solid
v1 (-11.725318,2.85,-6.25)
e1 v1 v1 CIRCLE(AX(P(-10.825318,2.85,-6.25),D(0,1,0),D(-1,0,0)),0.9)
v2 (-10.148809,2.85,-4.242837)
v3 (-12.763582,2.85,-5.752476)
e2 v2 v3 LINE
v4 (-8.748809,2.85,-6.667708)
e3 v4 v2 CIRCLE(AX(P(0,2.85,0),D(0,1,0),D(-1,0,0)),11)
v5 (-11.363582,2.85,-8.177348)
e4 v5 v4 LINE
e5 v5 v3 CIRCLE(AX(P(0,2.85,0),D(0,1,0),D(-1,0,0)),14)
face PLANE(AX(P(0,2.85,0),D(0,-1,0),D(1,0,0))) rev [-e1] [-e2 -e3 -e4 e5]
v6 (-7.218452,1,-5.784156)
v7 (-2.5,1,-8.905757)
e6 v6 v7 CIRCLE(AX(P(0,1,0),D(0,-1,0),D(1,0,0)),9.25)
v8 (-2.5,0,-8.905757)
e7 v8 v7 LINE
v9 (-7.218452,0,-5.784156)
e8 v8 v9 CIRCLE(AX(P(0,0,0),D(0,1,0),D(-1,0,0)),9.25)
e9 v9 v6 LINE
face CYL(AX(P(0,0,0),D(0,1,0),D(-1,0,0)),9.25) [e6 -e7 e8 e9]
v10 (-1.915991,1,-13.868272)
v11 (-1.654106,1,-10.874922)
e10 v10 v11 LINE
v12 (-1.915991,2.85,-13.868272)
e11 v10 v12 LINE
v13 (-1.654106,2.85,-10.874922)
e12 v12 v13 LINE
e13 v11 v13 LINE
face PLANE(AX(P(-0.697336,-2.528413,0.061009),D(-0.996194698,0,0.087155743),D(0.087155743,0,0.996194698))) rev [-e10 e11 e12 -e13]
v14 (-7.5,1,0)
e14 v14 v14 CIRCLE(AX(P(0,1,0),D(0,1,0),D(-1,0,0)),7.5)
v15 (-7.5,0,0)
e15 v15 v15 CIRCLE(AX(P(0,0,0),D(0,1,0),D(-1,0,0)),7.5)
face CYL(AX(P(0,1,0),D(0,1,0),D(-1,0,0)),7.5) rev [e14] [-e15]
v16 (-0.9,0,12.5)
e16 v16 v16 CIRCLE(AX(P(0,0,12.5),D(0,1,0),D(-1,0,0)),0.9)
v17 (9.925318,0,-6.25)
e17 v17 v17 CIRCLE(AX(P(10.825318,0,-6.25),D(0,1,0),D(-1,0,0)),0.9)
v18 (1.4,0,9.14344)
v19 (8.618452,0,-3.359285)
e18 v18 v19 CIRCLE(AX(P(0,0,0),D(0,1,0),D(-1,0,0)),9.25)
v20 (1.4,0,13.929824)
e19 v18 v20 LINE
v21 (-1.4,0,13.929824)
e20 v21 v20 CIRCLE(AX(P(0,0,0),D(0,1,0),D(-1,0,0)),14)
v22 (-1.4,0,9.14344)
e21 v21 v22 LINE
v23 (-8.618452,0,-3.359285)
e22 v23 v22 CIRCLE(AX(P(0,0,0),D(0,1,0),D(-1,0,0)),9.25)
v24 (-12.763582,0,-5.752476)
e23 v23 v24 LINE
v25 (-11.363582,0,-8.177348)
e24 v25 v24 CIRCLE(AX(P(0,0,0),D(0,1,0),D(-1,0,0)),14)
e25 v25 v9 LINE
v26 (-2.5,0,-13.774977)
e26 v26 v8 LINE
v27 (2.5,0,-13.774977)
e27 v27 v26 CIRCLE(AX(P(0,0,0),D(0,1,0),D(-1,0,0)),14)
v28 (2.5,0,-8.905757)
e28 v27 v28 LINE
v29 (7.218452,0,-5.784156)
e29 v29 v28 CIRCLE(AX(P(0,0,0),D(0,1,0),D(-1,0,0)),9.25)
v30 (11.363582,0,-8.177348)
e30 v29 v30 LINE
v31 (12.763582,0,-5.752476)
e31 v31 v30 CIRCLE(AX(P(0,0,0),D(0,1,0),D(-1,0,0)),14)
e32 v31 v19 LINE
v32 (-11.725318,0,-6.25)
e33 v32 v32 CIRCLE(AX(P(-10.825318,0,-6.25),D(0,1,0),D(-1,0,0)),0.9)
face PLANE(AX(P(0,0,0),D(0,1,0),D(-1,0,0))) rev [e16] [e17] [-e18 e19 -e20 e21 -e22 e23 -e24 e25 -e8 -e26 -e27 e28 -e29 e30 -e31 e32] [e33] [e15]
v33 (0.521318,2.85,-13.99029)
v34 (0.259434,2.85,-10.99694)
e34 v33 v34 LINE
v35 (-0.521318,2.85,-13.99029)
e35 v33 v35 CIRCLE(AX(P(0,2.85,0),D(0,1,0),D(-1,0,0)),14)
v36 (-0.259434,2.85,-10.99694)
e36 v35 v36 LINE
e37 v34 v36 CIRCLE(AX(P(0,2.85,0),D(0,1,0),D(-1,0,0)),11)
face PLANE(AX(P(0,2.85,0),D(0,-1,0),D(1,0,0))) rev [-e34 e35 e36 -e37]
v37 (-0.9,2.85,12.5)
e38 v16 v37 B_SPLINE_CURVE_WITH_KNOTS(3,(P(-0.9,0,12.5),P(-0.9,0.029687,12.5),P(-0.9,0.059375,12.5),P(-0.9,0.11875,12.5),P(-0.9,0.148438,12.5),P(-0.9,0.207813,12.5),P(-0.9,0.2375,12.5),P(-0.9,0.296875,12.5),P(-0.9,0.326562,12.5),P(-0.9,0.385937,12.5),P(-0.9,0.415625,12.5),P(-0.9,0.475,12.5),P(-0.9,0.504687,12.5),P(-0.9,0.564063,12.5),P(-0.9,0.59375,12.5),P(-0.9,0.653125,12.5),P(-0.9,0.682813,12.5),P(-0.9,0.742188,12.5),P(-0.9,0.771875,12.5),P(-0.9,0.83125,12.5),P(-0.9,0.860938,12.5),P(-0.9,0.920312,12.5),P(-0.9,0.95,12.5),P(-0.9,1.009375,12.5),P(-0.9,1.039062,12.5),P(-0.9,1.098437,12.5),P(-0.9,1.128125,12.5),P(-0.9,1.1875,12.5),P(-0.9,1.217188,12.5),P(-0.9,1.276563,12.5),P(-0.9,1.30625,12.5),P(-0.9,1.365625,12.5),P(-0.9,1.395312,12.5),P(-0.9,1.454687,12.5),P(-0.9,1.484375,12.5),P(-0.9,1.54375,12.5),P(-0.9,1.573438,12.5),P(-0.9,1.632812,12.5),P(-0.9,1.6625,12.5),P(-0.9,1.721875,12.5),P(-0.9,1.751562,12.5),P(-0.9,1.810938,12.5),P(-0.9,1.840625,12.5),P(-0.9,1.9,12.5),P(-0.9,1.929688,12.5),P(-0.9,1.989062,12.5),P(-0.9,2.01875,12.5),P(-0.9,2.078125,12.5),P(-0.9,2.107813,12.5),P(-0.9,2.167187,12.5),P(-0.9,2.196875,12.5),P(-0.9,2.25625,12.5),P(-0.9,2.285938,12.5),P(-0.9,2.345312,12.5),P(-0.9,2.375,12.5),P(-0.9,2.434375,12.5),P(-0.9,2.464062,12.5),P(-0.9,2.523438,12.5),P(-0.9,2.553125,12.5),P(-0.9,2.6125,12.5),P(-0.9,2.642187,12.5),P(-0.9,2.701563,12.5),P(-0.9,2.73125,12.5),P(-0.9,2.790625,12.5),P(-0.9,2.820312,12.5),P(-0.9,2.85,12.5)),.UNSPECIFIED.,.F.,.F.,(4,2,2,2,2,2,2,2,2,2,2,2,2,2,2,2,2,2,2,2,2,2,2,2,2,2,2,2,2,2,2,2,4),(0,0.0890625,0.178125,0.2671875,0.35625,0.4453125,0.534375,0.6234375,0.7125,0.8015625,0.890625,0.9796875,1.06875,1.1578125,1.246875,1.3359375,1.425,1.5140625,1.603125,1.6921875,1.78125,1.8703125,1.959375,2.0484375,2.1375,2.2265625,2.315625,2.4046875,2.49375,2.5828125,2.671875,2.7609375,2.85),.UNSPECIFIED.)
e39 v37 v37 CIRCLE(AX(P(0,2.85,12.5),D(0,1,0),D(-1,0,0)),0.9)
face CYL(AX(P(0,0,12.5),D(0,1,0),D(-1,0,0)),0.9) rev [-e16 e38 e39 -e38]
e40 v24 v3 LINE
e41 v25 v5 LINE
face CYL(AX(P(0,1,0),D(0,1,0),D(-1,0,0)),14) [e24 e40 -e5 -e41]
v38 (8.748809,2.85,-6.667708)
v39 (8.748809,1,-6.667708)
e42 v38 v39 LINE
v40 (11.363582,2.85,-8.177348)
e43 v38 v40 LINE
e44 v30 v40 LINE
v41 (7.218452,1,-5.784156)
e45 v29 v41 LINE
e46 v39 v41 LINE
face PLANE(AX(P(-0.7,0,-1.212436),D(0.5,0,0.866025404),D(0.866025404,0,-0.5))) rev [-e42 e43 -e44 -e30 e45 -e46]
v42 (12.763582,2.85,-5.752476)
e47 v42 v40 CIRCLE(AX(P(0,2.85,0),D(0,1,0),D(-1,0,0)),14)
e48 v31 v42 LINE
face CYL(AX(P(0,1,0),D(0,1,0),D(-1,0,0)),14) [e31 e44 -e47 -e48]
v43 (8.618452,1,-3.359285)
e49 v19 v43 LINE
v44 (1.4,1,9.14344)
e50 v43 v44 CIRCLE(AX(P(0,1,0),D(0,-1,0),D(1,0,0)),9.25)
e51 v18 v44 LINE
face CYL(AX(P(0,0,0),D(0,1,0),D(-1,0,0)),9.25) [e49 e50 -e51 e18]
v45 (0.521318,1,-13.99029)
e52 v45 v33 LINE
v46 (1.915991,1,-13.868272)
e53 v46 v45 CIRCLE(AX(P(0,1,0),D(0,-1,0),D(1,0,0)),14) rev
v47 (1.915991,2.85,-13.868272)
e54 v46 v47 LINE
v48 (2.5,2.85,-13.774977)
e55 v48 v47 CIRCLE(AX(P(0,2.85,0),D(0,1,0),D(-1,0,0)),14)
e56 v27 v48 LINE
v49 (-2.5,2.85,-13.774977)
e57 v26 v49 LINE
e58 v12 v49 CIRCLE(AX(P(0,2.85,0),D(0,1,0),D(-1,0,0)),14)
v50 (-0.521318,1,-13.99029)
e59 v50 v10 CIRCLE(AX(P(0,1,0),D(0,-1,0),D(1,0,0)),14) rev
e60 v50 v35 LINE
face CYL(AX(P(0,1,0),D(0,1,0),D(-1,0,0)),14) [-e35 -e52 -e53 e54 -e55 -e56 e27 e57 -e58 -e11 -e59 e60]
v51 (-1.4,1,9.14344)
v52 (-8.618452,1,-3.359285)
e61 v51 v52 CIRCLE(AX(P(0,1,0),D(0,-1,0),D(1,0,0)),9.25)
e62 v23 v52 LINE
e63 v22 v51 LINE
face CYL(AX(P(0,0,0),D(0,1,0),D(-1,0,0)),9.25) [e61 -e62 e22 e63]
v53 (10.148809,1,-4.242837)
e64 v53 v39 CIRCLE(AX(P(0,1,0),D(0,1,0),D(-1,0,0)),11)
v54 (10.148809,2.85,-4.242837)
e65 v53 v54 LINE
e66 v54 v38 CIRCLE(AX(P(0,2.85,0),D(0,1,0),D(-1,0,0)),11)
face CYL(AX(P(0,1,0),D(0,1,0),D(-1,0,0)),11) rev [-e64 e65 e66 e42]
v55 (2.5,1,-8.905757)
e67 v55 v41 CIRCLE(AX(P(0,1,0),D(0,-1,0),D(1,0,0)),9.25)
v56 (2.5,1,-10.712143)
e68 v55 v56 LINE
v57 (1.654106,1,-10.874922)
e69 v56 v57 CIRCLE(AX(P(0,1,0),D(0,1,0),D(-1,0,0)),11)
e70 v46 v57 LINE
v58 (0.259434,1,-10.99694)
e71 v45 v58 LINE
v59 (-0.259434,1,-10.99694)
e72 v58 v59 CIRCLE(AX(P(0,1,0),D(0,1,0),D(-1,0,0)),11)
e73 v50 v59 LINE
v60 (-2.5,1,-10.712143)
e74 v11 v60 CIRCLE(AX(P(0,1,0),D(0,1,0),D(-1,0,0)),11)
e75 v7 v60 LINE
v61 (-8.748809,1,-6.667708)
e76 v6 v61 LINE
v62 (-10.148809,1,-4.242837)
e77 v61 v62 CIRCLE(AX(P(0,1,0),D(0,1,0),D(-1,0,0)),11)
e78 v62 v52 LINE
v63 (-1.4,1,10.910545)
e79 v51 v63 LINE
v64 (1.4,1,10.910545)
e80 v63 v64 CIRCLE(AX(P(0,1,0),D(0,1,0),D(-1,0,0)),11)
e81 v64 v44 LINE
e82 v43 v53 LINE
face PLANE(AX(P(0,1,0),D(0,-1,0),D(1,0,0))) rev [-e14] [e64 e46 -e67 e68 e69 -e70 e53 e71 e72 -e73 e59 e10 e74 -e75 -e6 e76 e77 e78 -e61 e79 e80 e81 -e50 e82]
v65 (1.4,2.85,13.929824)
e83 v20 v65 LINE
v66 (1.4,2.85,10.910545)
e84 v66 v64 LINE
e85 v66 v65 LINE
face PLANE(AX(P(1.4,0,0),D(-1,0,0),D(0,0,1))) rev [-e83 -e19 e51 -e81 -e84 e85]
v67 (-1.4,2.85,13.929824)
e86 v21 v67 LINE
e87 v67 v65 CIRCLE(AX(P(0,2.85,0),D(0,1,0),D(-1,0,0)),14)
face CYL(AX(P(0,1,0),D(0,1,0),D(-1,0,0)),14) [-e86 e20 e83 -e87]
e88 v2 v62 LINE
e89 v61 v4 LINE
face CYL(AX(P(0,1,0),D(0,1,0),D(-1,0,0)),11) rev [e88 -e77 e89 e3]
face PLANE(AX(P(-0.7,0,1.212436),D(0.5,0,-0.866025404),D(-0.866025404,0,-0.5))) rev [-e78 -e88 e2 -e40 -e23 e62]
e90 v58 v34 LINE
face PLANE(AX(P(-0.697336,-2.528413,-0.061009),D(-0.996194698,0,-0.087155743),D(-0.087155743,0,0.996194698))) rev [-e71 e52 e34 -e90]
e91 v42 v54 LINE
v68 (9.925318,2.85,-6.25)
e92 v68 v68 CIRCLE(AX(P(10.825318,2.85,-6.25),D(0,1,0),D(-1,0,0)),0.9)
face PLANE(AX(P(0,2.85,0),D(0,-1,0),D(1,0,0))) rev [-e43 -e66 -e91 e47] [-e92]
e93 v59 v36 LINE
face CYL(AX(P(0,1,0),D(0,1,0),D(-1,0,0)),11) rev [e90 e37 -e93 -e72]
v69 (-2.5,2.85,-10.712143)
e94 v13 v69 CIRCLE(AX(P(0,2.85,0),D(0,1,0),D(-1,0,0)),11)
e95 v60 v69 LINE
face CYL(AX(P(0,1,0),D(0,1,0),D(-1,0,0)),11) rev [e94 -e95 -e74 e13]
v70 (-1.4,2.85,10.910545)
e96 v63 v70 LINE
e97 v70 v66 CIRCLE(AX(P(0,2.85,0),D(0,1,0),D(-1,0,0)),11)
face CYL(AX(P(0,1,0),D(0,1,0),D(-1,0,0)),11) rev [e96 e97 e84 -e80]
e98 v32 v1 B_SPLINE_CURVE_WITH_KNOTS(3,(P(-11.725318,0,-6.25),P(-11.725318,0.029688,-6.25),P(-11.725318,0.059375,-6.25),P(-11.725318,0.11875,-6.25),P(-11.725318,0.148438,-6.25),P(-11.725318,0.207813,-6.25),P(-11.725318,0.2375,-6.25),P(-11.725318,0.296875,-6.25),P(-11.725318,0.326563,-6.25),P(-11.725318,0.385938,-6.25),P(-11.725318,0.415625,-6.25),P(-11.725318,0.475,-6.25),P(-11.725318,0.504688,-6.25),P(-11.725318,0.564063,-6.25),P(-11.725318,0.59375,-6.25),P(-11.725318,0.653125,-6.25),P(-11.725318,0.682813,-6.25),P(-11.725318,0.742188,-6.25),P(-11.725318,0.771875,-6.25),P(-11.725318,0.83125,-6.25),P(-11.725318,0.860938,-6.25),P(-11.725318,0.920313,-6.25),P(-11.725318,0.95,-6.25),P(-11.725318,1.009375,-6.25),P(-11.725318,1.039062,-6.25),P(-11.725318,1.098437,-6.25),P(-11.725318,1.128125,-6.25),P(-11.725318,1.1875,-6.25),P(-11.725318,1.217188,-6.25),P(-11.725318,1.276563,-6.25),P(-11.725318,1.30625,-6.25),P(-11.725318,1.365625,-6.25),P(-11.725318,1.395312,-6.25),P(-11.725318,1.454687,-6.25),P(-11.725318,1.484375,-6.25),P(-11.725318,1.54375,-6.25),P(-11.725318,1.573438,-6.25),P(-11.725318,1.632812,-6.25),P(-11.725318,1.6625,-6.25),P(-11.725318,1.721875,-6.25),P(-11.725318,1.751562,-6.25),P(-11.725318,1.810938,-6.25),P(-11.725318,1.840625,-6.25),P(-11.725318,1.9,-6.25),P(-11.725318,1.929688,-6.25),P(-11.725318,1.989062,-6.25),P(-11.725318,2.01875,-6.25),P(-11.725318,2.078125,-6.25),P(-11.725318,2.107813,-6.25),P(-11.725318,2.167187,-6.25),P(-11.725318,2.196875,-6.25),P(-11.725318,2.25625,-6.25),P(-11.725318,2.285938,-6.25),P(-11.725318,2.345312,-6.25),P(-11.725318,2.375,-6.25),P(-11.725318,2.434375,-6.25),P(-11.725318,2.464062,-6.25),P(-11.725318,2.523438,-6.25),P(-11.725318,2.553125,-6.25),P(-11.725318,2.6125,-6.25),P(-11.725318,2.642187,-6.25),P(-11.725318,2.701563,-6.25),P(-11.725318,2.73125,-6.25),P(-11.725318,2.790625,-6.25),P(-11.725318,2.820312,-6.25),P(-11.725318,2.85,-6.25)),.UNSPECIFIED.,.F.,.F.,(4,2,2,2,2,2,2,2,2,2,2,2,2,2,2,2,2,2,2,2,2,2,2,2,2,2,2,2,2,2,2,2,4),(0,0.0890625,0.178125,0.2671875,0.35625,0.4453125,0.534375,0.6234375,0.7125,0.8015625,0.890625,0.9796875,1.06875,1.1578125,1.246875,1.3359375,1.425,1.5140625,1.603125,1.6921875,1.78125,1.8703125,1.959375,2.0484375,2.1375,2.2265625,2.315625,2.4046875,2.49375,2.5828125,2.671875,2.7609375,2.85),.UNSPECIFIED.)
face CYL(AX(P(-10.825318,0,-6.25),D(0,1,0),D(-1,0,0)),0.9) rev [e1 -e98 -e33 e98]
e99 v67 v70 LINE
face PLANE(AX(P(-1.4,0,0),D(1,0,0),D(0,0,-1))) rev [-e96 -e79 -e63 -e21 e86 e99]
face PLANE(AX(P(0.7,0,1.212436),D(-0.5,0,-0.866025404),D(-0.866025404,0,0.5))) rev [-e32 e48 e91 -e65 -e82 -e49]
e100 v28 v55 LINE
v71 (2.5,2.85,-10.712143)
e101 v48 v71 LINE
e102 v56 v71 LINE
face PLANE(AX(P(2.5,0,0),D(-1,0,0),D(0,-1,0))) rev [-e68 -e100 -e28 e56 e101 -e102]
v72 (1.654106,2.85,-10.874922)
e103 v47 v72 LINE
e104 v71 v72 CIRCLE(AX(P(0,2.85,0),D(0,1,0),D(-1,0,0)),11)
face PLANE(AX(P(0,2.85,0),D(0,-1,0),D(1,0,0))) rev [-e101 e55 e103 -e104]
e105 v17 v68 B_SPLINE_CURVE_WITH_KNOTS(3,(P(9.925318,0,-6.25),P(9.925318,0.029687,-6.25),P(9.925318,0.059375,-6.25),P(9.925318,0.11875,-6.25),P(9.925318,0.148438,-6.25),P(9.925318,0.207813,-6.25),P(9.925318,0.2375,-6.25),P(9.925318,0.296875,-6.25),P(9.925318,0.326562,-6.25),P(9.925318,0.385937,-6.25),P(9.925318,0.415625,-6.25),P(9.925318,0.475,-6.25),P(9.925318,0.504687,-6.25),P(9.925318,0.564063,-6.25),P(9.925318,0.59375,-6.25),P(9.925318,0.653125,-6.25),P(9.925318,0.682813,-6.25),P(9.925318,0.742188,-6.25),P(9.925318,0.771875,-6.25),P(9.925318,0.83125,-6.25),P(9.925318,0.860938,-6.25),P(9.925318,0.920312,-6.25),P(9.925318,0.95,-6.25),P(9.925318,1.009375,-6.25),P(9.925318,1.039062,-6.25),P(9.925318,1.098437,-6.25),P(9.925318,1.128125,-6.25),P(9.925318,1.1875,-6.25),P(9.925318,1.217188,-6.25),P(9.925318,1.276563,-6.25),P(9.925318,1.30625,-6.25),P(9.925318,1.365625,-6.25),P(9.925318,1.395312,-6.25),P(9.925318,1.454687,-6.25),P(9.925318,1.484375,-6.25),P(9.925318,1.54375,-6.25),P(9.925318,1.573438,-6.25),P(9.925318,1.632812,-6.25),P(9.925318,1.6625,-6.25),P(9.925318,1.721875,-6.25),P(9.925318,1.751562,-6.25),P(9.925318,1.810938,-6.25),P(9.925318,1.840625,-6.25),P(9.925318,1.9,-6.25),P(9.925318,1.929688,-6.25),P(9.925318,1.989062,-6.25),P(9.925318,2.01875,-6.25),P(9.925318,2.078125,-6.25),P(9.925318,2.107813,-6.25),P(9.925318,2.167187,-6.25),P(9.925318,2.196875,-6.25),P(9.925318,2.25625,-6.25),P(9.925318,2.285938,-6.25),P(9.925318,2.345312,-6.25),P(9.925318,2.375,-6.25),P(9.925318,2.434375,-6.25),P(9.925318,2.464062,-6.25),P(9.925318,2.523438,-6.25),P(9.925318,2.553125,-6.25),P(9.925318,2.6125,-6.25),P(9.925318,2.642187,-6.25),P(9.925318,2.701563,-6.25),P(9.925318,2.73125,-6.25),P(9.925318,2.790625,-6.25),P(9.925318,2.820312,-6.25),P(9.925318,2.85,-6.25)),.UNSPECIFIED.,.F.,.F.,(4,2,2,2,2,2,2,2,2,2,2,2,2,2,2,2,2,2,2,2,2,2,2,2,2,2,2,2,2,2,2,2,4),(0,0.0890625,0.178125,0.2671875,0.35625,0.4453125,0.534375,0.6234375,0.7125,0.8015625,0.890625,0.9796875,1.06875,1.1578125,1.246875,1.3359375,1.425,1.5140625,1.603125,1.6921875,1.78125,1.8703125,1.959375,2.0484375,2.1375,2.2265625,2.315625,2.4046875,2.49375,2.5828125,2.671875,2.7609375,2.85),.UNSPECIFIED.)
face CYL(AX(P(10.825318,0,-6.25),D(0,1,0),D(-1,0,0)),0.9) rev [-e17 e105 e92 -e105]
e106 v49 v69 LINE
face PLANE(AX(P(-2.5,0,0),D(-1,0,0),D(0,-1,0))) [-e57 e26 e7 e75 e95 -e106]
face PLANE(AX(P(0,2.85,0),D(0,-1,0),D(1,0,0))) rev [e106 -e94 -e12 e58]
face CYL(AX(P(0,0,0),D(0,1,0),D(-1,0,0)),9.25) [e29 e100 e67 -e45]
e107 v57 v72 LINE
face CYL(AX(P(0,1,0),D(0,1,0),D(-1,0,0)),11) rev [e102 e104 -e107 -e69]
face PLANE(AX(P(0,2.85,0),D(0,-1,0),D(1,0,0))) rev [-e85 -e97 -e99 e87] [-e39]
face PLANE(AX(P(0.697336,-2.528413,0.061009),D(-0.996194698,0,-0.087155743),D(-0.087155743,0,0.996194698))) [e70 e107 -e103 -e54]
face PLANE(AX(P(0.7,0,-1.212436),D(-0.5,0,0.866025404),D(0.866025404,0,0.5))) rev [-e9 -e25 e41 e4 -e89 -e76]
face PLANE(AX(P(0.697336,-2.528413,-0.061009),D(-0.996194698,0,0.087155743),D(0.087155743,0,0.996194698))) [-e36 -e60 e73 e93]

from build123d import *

# Parameters (mm, degrees)
CUT_EXTRUDE1_DEPTH     = 1.85
CUT_EXTRUDE2_START     = -2.85
CUT_EXTRUDE2_OUTLINE_R = 0.9
CUT_EXTRUDE2_DEPTH     = 2.85


# Read off the part's stored shape, not the designer's step: Cut-Extrude2
with BuildPart() as part:
    # Sketch1 → Revolve1 (revolve)
    with BuildSketch(Plane.XY, mode=Mode.PRIVATE) as revolve1_sk:
        Polygon((7.5, 0.9999999999999996), (7.5, 0), (14.000000000000002, 0), (14.000000000000002, 2.8500000000000005), (11.000000000000002, 2.85), (11.000000000000002, 1), align=None)
    revolve(revolve1_sk.sketch.rotate(Axis((3e-17, 0.9999999999999987, 0), (-3e-17, -1, 0)), 180), axis=Axis((3e-17, 0.9999999999999987, 0), (-3e-17, -1, 0)))

    # Sketch2 → Cut-Extrude1 (cut)
    with BuildSketch(Plane(origin=(9e-17, 2.8500000000000005, 0), x_dir=(1, -3e-17, 0), z_dir=(3e-17, 1, 0))):
        with BuildLine():
            ThreePointArc((0.259433716221758, 10.996940217482653), (0.6093823027349546, 10.983107629861117), (0.9587131702244344, 10.958141679009186))
            Line((0.9587131702242476, 10.9581416790092), (1.2201803984672228, 13.946725773284436))
            ThreePointArc((1.2201803984672233, 13.946725773284438), (0.8710215713285331, 13.97287806510457), (0.521317929845157, 13.99029047647053))
            Line((0.5213179298455201, 13.99029047647048), (0.25943371622169603, 10.996940217482662))
        make_face()
        with BuildLine():
            Line((1.2201803984672228, 13.946725773284436), (0.9587131702242476, 10.9581416790092))
            ThreePointArc((0.9587131702244344, 10.958141679009186), (1.3070722087636013, 10.922067672427135), (1.6541062935502489, 10.874922177635916))
            Line((1.6541062935501436, 10.874922177635918), (1.9159905071739696, 13.868272436623787))
            ThreePointArc((1.9159905071740335, 13.868272436623785), (1.5685760162822768, 13.911849958979003), (1.2201803984672233, 13.946725773284438))
        make_face()
        with BuildLine():
            Line((-1.9159905071739802, 13.868272436623787), (-1.654106293550152, 10.874922177635916))
            ThreePointArc((-1.654106293550262, 10.874922177635913), (-0.9587131702243502, 10.958141679009193), (-0.25943371622180056, 10.996940217482653))
            Line((-0.259433716221705, 10.996940217482667), (-0.5213179298455309, 13.990290476470479))
            ThreePointArc((-0.5213179298451552, 13.99029047647053), (-0.8710219940751529, 13.97287803875198), (-1.2201812423779956, 13.946725699451788))
            ThreePointArc((-1.2201812423779956, 13.946725699451788), (-1.5685764371825126, 13.911849911522042), (-1.9159905071740533, 13.868272436623784))
        make_face()
    extrude(amount=-CUT_EXTRUDE1_DEPTH, mode=Mode.SUBTRACT)

    # Cut-Extrude2 outline → Cut-Extrude2 (cut)
    with BuildSketch(Plane(origin=(9e-17, 2.8500000000000005, 0), x_dir=(1, -3e-17, 0), z_dir=(3e-17, 1, 0)).offset(CUT_EXTRUDE2_START)):
        with BuildLine():
            ThreePointArc((8.618451553, 3.35928457), (8.010734985, -4.625), (1.4, -9.143440272))
            Line((1.4, -9.143440272), (1.4, -13.929824119))
            ThreePointArc((1.4, -13.929824119), (12.124355653, -7), (12.763581558, 5.752476494))
            Line((12.763581558, 5.752476494), (8.618451553, 3.35928457))
        make_face()
        with BuildLine():
            Line((-8.618451553, 3.35928457), (-12.763581558, 5.752476494))
            ThreePointArc((-12.763581558, 5.752476494), (-12.124355653, -7), (-1.4, -13.929824119))
            Line((-1.4, -13.929824119), (-1.4, -9.143440272))
            ThreePointArc((-1.4, -9.143440272), (-8.010734985, -4.625), (-8.618451553, 3.35928457))
        make_face()
        with BuildLine():
            Line((2.5, 13.774977314), (2.5, 8.905756565))
            ThreePointArc((2.5, 8.905756565), (5.103741092, 7.714552927), (7.218451553, 5.784155701))
            Line((7.218451553, 5.784155701), (11.363581558, 8.177347625))
            ThreePointArc((11.363581558, 8.177347625), (7.475499176, 11.837098972), (2.5, 13.774977314))
        make_face()
        with BuildLine():
            Line((-2.5, 8.905756565), (-2.5, 13.774977314))
            ThreePointArc((-2.5, 13.774977314), (-7.475499176, 11.837098972), (-11.363581558, 8.177347625))
            Line((-11.363581558, 8.177347625), (-7.218451553, 5.784155701))
            ThreePointArc((-7.218451553, 5.784155701), (-5.103741092, 7.714552927), (-2.5, 8.905756565))
        make_face()
        with Locations((-10.825317547, 6.25)):
            Circle(CUT_EXTRUDE2_OUTLINE_R)
        with Locations((0, -12.5)):
            Circle(CUT_EXTRUDE2_OUTLINE_R)
        with Locations((10.825317547, 6.25)):
            Circle(CUT_EXTRUDE2_OUTLINE_R)
    extrude(amount=CUT_EXTRUDE2_DEPTH, mode=Mode.SUBTRACT)


solid = part.part
